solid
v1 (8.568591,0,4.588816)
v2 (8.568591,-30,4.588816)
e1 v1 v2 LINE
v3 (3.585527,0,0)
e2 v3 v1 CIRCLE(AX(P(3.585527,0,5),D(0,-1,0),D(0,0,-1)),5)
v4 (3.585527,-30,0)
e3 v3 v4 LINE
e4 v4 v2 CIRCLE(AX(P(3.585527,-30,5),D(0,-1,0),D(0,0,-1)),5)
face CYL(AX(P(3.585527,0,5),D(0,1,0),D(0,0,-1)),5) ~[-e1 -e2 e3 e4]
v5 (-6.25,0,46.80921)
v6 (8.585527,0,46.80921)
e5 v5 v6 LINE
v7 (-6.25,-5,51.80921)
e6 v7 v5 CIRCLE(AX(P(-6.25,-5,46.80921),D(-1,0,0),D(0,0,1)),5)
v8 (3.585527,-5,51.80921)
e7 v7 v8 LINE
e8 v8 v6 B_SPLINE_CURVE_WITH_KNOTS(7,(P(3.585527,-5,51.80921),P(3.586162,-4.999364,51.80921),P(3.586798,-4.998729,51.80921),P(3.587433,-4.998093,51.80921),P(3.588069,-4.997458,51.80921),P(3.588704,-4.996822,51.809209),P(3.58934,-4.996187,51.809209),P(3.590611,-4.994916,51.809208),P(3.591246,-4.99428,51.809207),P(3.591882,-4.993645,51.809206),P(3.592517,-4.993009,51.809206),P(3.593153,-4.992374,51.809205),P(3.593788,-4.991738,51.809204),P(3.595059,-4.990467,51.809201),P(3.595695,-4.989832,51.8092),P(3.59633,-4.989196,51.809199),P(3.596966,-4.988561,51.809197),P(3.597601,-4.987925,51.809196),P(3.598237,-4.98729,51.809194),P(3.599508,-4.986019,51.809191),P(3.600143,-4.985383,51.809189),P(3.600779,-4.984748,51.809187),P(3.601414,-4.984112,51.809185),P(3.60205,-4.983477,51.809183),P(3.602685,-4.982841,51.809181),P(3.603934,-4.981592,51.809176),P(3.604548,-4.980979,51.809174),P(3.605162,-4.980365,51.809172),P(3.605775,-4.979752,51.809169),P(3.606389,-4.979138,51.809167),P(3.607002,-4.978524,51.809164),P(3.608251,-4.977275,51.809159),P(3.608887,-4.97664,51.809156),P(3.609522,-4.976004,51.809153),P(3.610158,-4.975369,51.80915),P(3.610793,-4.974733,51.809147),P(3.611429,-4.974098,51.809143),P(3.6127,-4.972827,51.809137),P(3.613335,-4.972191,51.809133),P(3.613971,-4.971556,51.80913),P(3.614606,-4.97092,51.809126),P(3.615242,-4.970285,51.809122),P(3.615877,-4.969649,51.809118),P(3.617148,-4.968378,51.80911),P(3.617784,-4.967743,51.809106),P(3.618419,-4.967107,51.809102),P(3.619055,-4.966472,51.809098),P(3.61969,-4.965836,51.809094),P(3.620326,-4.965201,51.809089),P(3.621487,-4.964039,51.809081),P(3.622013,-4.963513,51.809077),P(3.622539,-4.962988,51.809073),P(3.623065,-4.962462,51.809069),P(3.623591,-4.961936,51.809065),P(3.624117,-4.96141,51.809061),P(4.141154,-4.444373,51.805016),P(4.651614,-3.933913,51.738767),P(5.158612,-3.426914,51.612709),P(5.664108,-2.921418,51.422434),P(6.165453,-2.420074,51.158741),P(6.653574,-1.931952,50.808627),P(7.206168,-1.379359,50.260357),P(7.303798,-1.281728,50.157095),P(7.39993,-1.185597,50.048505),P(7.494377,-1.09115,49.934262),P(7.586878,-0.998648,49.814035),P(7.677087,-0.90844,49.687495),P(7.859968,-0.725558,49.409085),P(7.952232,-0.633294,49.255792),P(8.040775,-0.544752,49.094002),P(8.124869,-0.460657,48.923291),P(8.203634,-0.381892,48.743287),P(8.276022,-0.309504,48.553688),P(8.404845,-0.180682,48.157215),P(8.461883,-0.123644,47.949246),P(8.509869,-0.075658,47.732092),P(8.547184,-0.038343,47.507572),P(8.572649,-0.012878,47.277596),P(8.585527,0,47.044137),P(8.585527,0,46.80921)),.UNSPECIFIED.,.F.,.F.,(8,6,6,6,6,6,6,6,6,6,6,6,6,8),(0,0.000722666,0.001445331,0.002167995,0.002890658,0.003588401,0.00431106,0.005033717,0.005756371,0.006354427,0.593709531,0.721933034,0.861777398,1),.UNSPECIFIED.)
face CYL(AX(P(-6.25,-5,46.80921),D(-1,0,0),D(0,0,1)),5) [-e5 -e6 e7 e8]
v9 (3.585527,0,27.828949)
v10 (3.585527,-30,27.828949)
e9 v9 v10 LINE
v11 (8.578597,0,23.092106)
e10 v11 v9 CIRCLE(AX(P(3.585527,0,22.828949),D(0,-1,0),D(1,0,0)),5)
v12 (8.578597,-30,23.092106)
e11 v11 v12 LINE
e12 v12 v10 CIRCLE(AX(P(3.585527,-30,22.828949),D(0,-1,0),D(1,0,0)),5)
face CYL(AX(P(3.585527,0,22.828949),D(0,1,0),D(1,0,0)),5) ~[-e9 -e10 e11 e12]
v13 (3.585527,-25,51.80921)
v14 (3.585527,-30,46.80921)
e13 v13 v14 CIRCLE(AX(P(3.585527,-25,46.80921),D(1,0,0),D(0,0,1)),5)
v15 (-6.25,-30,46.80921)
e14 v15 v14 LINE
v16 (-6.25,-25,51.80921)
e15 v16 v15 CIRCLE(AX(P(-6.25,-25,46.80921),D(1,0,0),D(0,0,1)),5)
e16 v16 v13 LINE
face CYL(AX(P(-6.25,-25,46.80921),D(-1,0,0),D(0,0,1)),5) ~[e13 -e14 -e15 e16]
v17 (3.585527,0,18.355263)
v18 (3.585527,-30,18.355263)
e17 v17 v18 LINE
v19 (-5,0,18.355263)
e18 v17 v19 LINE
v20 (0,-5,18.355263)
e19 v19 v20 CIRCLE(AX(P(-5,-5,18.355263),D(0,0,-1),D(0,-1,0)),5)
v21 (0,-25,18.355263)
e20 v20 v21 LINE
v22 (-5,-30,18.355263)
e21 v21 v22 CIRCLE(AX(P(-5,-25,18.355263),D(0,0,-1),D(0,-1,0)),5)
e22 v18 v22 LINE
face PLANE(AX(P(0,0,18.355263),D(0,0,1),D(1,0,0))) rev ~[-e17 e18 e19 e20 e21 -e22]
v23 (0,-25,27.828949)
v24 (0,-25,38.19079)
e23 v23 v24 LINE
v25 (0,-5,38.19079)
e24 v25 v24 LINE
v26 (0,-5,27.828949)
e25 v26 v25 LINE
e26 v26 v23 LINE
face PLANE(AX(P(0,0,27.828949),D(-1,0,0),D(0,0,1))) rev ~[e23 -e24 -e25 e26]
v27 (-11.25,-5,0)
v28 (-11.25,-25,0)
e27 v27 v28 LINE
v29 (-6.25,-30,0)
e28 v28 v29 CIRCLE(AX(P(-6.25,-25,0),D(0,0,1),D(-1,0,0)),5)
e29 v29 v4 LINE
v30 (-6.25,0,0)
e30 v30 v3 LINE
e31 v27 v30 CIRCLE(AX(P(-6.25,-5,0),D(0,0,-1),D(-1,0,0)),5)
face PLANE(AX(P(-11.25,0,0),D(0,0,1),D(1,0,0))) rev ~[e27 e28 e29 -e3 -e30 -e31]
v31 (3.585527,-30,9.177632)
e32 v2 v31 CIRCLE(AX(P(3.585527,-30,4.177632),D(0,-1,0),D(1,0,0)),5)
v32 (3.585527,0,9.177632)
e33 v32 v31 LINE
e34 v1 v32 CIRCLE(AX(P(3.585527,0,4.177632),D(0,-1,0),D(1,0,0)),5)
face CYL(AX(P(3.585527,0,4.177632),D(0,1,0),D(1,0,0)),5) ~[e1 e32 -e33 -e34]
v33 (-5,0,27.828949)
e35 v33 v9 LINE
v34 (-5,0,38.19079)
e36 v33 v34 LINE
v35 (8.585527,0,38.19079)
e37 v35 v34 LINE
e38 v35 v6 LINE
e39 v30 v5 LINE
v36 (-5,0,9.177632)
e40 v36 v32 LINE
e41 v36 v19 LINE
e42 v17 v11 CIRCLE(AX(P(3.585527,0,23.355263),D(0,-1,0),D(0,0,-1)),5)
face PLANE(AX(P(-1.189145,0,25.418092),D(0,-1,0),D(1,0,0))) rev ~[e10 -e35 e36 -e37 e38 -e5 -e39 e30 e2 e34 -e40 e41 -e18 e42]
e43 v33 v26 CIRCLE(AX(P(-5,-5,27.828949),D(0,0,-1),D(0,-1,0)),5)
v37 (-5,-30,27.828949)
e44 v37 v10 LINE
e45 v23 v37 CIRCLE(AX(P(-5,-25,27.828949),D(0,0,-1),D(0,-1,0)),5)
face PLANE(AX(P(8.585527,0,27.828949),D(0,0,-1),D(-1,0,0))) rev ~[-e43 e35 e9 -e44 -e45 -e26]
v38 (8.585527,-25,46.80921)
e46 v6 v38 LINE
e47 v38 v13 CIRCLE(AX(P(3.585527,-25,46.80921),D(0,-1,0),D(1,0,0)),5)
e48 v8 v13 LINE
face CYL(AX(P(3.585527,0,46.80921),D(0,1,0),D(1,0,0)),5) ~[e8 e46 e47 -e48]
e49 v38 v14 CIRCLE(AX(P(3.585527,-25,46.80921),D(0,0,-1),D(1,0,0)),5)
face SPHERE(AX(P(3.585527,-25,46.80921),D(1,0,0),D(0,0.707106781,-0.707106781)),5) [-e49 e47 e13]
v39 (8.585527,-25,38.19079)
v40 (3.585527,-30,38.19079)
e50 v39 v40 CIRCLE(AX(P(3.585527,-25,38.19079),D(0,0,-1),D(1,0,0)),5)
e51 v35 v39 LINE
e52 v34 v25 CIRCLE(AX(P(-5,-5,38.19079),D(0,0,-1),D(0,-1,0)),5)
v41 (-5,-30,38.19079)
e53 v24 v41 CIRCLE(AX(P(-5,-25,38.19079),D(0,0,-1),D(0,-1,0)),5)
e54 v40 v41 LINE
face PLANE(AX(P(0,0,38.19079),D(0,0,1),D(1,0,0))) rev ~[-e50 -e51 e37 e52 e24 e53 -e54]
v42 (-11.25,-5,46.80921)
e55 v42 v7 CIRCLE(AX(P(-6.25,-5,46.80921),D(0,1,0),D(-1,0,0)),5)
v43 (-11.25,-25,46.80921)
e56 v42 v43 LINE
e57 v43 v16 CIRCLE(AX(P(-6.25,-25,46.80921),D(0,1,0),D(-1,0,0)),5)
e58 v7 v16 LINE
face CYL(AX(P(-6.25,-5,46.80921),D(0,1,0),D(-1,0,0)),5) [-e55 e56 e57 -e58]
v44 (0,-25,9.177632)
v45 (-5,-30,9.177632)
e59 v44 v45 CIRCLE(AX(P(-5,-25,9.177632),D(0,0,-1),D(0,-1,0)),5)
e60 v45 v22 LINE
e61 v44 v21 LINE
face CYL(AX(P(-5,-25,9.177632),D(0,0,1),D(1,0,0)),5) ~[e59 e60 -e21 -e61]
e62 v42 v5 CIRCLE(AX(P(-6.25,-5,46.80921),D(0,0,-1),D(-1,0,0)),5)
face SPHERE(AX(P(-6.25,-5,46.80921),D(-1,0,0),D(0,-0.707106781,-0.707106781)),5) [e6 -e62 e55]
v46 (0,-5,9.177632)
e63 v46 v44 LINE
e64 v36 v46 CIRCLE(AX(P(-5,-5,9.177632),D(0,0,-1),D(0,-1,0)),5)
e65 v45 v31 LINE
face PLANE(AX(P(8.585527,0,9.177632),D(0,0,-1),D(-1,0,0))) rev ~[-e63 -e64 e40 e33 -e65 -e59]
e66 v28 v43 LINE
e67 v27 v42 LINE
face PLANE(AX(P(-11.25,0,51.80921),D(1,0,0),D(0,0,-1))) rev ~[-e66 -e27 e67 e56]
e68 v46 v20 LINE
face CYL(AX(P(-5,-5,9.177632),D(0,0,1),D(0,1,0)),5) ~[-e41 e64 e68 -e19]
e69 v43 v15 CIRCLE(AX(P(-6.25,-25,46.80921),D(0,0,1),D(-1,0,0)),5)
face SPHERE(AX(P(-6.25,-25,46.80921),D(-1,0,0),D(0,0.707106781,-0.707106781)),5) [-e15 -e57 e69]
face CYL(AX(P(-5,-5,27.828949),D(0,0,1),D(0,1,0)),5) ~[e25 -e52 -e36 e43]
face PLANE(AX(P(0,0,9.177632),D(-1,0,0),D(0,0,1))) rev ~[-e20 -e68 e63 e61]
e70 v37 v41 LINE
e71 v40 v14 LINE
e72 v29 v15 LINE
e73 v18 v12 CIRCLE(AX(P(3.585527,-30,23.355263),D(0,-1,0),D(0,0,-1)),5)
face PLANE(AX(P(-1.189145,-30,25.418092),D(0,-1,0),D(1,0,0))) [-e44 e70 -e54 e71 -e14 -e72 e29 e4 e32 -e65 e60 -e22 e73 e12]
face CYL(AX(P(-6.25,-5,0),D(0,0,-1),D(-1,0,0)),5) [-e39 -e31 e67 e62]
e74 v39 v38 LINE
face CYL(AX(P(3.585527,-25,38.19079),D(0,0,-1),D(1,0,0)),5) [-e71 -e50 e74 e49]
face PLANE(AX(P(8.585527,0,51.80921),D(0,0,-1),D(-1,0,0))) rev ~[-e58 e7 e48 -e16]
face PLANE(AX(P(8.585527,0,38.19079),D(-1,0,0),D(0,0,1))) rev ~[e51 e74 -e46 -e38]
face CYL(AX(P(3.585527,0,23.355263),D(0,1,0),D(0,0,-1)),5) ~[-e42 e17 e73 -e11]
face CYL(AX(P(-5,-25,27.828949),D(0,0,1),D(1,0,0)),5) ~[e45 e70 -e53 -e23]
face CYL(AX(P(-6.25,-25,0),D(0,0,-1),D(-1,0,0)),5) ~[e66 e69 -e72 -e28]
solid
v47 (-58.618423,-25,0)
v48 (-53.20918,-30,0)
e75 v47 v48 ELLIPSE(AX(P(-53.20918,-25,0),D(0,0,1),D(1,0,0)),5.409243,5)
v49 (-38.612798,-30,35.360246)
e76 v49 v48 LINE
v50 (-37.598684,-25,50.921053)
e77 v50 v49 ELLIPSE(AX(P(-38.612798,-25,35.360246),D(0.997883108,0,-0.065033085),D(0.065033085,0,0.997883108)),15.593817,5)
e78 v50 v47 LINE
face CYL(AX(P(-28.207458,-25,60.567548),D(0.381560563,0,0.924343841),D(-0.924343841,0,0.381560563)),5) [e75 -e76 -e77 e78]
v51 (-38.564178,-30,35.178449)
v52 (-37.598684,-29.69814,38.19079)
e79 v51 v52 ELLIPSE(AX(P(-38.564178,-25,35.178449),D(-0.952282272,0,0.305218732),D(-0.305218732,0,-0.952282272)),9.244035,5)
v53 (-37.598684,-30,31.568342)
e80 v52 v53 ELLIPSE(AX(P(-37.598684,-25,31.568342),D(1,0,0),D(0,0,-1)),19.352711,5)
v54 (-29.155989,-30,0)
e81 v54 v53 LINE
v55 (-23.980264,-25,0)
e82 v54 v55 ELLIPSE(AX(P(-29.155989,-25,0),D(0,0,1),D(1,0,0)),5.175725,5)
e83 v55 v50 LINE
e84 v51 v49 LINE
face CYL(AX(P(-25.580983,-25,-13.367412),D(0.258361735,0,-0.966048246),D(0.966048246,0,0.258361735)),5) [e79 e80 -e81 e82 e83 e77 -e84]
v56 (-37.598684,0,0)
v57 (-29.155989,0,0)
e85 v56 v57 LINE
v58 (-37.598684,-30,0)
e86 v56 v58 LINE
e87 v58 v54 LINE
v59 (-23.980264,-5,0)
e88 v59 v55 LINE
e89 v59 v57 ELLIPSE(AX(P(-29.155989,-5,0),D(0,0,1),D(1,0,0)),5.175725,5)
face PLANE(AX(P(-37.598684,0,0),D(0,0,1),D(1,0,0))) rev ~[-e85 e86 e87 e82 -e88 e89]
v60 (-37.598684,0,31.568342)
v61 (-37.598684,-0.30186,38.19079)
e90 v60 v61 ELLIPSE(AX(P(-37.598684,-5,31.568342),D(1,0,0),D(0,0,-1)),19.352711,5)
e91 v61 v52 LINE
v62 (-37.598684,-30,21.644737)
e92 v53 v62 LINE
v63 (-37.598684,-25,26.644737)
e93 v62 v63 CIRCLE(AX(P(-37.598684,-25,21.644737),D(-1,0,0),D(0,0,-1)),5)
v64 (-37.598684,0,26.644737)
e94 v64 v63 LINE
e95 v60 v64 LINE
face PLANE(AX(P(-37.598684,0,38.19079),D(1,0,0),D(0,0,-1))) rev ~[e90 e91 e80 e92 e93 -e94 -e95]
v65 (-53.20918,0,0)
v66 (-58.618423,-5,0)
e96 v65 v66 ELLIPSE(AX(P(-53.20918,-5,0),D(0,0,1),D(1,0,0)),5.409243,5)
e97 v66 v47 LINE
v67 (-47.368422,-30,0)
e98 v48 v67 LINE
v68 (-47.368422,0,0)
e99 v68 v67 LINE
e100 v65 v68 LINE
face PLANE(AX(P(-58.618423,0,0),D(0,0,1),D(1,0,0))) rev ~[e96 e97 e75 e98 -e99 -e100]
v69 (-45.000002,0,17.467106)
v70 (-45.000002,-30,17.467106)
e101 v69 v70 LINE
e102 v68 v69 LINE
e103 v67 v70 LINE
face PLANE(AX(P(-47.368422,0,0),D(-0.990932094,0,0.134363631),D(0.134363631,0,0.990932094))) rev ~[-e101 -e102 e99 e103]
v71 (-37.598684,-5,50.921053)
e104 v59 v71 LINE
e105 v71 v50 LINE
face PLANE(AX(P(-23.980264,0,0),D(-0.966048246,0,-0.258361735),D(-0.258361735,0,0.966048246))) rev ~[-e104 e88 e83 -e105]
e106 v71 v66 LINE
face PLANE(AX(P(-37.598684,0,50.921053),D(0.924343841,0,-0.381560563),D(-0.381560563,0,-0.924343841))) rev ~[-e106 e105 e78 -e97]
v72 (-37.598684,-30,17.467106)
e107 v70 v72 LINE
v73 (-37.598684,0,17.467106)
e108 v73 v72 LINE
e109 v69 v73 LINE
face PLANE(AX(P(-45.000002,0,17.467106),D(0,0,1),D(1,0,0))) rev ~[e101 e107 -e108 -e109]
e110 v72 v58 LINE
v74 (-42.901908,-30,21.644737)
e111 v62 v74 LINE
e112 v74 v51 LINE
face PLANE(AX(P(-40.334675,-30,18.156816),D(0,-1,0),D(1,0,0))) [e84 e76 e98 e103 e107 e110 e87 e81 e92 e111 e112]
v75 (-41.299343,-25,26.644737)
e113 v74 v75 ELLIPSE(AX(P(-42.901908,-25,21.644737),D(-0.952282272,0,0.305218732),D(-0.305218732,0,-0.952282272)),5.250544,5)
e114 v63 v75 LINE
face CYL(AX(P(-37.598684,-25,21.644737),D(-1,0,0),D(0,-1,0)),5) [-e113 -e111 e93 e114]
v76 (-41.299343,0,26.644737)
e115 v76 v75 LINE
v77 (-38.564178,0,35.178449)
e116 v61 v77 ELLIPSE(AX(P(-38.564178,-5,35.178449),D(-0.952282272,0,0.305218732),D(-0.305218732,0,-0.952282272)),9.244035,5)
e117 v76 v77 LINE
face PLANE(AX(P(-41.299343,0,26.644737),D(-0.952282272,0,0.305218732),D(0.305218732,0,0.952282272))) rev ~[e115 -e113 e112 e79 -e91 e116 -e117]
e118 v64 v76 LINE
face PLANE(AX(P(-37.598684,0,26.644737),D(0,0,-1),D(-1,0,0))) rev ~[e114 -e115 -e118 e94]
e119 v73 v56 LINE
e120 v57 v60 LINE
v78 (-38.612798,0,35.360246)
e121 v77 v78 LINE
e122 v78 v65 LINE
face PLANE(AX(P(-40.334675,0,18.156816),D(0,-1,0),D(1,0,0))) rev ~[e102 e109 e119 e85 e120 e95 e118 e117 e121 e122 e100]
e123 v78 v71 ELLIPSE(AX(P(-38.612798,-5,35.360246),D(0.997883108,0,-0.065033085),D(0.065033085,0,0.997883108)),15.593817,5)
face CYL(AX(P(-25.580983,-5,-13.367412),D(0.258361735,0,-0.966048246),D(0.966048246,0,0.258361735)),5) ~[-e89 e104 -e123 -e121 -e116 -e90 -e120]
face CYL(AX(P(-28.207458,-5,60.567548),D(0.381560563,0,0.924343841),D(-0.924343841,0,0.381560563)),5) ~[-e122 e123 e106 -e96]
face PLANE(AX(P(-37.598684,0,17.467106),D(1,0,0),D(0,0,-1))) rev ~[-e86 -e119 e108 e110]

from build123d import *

# Parameters (mm, degrees)
F1_DEPTH       = 30
F2_T1_DEPTH    = 80.0888645747
F2_T3_DEPTH    = 77.7106724757
F2_2_T1_DEPTH  = 46.8092103302
F2_2_T3_DEPTH  = 14.835527055
F2_2_T5_DEPTH  = 9.835527055
F2_2_T7_DEPTH  = 20
F2_2_T9_DEPTH  = 8.6184208095
F2_2_T11_DEPTH = 25
F2_2_T13_DEPTH = 30
F2_2_S17_W     = 5.1
F2_2_S17_H     = 5.1
F2_2_T18_DEPTH = 5.1
F2_2_S23_W     = 5.1
F2_2_S23_H     = 5.1
F2_2_T24_DEPTH = 5.1
F2_2_S29_W     = 5.1
F2_2_S29_H     = 5.1
F2_2_T30_DEPTH = 5.1
F2_2_T37_DEPTH = 37.5
F2_2_T41_DEPTH = 27.335527055
F3_R           = 5
F3_2_R         = 5


# Not quite as in the source:
# - a fillet or chamfer that OpenCascade refuses, or shapes differently, is made with other operations: its cross-section is extruded or revolved along the edge and cut away or added


with BuildPart() as f1:
    # F0 (on Front) → F1 (new body)
    with BuildSketch(Plane.XZ):
        Polygon((-37.5986844301, 50.9210526943), (-58.6184225976, 0), (-47.3684221506, 0), (-45.0000017881, 17.4671057612), (-37.5986844301, 17.4671057612), (-37.5986844301, 0), (-23.9802636206, 0), align=None)
        Polygon((-37.5986844301, 26.6447365284), (-41.2993431091, 26.6447365284), (-37.5986844301, 38.1907895207), align=None, mode=Mode.SUBTRACT)
    extrude(amount=F1_DEPTH)

    # F2: fillet of radius 5 on 4 edges, made by hand

    # F2_s2 → F2_t1 (cut)
    with BuildSketch(Plane(origin=(17.2550791502, 0, 41.8010342303), x_dir=(0, 1, 0), z_dir=(-0.3815605627, 0, -0.9243438413))):
        with BuildLine():
            ThreePointArc((-25, -54.1835779154), (-28.5355339059, -52.7191118213), (-30, -49.1835779154))
            Line((-30, -49.1835779154), (-30, -54.1835779154))
            Line((-30, -54.1835779154), (-25, -54.1835779154))
        make_face()
        with BuildLine():
            ThreePointArc((-5, -54.1835779154), (-1.4644660941, -52.7191118213), (0, -49.1835779154))
            Line((0, -49.1835779154), (0, -54.1835779154))
            Line((0, -54.1835779154), (-5, -54.1835779154))
        make_face()
    extrude(amount=F2_T1_DEPTH, mode=Mode.SUBTRACT)

    # F2_s4 → F2_t3 (cut)
    with BuildSketch(Plane(origin=(1.6288202397, 0, -6.0903714472), x_dir=(0, 1, 0), z_dir=(-0.2583617353, 0, 0.9660482461))):
        with BuildLine():
            ThreePointArc((-25, 23.166091611), (-28.5355339059, 24.6305577051), (-30, 28.166091611))
            Line((-30, 28.166091611), (-30, 23.166091611))
            Line((-30, 23.166091611), (-25, 23.166091611))
        make_face()
        with BuildLine():
            ThreePointArc((-5, 23.166091611), (-1.4644660941, 24.6305577051), (0, 28.166091611))
            Line((0, 28.166091611), (0, 23.166091611))
            Line((0, 23.166091611), (-5, 23.166091611))
        make_face()
    extrude(amount=F2_T3_DEPTH, mode=Mode.SUBTRACT)

    # F3
    f3_edges = [f1.edges().sort_by_distance(p)[0] for p in [
        (-39.449014, -30, 26.644737),
    ]]
    fillet(f3_edges, radius=F3_R)


with BuildPart() as f1b:
    # F0 (on Front) → F1, piece 2 (new body)
    with BuildSketch(Plane.XZ):
        Polygon((-11.250000447, 51.8092103302), (-11.250000447, 0), (8.5855266079, 0), (8.5855266079, 9.1776316985), (0, 9.1776316985), (0, 18.3552633971), (8.5855266079, 18.3552633971), (8.5855266079, 27.8289485723), (0, 27.8289485723), (0, 38.1907895207), (8.5855266079, 38.1907895207), (8.5855266079, 51.8092103302), align=None)
    extrude(amount=F1_DEPTH)

    # F2#2: fillet of radius 5 on 11 edges, made by hand

    # F2_2_s2 → F2_2_t1 (cut)
    with BuildSketch(Plane.XY):
        with BuildLine():
            ThreePointArc((-11.250000447, -5), (-9.785534353, -1.4644660941), (-6.250000447, 0))
            Line((-6.250000447, 0), (-6.250000447, 0.1))
            Line((-6.250000447, 0.1), (-11.350000447, 0.1))
            Line((-11.350000447, 0.1), (-11.350000447, -5))
            Line((-11.350000447, -5), (-11.250000447, -5))
        make_face()
        with BuildLine():
            ThreePointArc((-11.250000447, -25), (-9.785534353, -28.5355339059), (-6.250000447, -30))
            Line((-6.250000447, -30), (-6.250000447, -30.1))
            Line((-6.250000447, -30.1), (-11.350000447, -30.1))
            Line((-11.350000447, -30.1), (-11.350000447, -25))
            Line((-11.350000447, -25), (-11.250000447, -25))
        make_face()
    extrude(amount=F2_2_T1_DEPTH, mode=Mode.SUBTRACT)

    # F2_2_s4 → F2_2_t3 (cut)
    with BuildSketch(Plane.YZ.offset(-6.250000447)):
        with BuildLine():
            ThreePointArc((-5, 51.8092103302), (-1.4644660941, 50.3447442362), (0, 46.8092103302))
            Line((0, 46.8092103302), (0.1, 46.8092103302))
            Line((0.1, 46.8092103302), (0.1, 51.9092103302))
            Line((0.1, 51.9092103302), (-5, 51.9092103302))
            Line((-5, 51.9092103302), (-5, 51.8092103302))
        make_face()
    extrude(amount=F2_2_T3_DEPTH, mode=Mode.SUBTRACT)

    # F2_2_s6 → F2_2_t5 (cut)
    with BuildSketch(Plane.YZ.offset(-6.250000447)):
        with BuildLine():
            ThreePointArc((-25, 51.8092103302), (-28.5355339059, 50.3447442362), (-30, 46.8092103302))
            Line((-30, 46.8092103302), (-30.1, 46.8092103302))
            Line((-30.1, 46.8092103302), (-30.1, 51.9092103302))
            Line((-30.1, 51.9092103302), (-25, 51.9092103302))
            Line((-25, 51.9092103302), (-25, 51.8092103302))
        make_face()
    extrude(amount=F2_2_T5_DEPTH, mode=Mode.SUBTRACT)

    # F2_2_s8 → F2_2_t7 (cut)
    with BuildSketch(Plane.XZ.offset(5)):
        with BuildLine():
            ThreePointArc((-11.250000447, 46.8092103302), (-9.785534353, 50.3447442362), (-6.250000447, 51.8092103302))
            Line((-6.250000447, 51.8092103302), (-6.250000447, 51.9092103302))
            Line((-6.250000447, 51.9092103302), (-11.350000447, 51.9092103302))
            Line((-11.350000447, 51.9092103302), (-11.350000447, 46.8092103302))
            Line((-11.350000447, 46.8092103302), (-11.250000447, 46.8092103302))
        make_face()
    extrude(amount=F2_2_T7_DEPTH, mode=Mode.SUBTRACT)

    # F2_2_s10 → F2_2_t9 (cut)
    with BuildSketch(Plane.XY.offset(38.1907895207)):
        with BuildLine():
            ThreePointArc((8.5855266079, -25), (7.1210605139, -28.5355339059), (3.5855266079, -30))
            Line((3.5855266079, -30), (3.5855266079, -30.1))
            Line((3.5855266079, -30.1), (8.6855266079, -30.1))
            Line((8.6855266079, -30.1), (8.6855266079, -25))
            Line((8.6855266079, -25), (8.5855266079, -25))
        make_face()
    extrude(amount=F2_2_T9_DEPTH, mode=Mode.SUBTRACT)

    # F2_2_s12 → F2_2_t11 (cut)
    with BuildSketch(Plane.XZ):
        with BuildLine():
            ThreePointArc((8.5855266079, 46.8092103302), (7.1210605139, 50.3447442362), (3.5855266079, 51.8092103302))
            Line((3.5855266079, 51.8092103302), (3.5855266079, 51.9092103302))
            Line((3.5855266079, 51.9092103302), (8.6855266079, 51.9092103302))
            Line((8.6855266079, 51.9092103302), (8.6855266079, 46.8092103302))
            Line((8.6855266079, 46.8092103302), (8.5855266079, 46.8092103302))
        make_face()
    extrude(amount=F2_2_T11_DEPTH, mode=Mode.SUBTRACT)

    # F2_2_s14 → F2_2_t13 (cut)
    with BuildSketch(Plane.XZ):
        with BuildLine():
            ThreePointArc((8.5855266079, 22.8289485723), (7.1210605139, 26.3644824782), (3.5855266079, 27.8289485723))
            Line((3.5855266079, 27.8289485723), (3.5855266079, 27.9289485723))
            Line((3.5855266079, 27.9289485723), (8.6855266079, 27.9289485723))
            Line((8.6855266079, 27.9289485723), (8.6855266079, 22.8289485723))
            Line((8.6855266079, 22.8289485723), (8.5855266079, 22.8289485723))
        make_face()
        with BuildLine():
            ThreePointArc((3.5855266079, 18.3552633971), (7.1210605139, 19.8197294912), (8.5855266079, 23.3552633971))
            Line((8.5855266079, 23.3552633971), (8.6855266079, 23.3552633971))
            Line((8.6855266079, 23.3552633971), (8.6855266079, 18.2552633971))
            Line((8.6855266079, 18.2552633971), (3.5855266079, 18.2552633971))
            Line((3.5855266079, 18.2552633971), (3.5855266079, 18.3552633971))
        make_face()
        with BuildLine():
            ThreePointArc((8.5855266079, 4.1776316985), (7.1210605139, 7.7131656045), (3.5855266079, 9.1776316985))
            Line((3.5855266079, 9.1776316985), (3.5855266079, 9.2776316985))
            Line((3.5855266079, 9.2776316985), (8.6855266079, 9.2776316985))
            Line((8.6855266079, 9.2776316985), (8.6855266079, 4.1776316985))
            Line((8.6855266079, 4.1776316985), (8.5855266079, 4.1776316985))
        make_face()
        with BuildLine():
            ThreePointArc((3.5855266079, 0), (7.1210605139, 1.4644660941), (8.5855266079, 5))
            Line((8.5855266079, 5), (8.6855266079, 5))
            Line((8.6855266079, 5), (8.6855266079, -0.1))
            Line((8.6855266079, -0.1), (3.5855266079, -0.1))
            Line((3.5855266079, -0.1), (3.5855266079, 0))
        make_face()
    extrude(amount=F2_2_T13_DEPTH, mode=Mode.SUBTRACT)


with BuildPart() as f2_2_tool16:
    # F2_2_s17 → F2_2_t18 (new body)
    with BuildSketch(Plane.YZ.offset(-6.250000447)):
        with Locations((-2.45, 49.3592103302)):
            Rectangle(F2_2_S17_W, F2_2_S17_H)
    extrude(amount=-F2_2_T18_DEPTH)

    # F2_2_s19 → F2_2_t20 (revolve, cut)
    with BuildSketch(Plane(origin=(-6.250000447, -5, 46.8092103302), x_dir=(0, -0.7071067812, -0.7071067812), z_dir=(0, 0.7071067812, -0.7071067812))):
        with BuildLine():
            ThreePointArc((0, -5), (5, 0), (0, 5))
            Line((0, 5), (0, -5))
        make_face()
    revolve(axis=Axis((-6.250000447, -5, 46.8092103302), (-1, 0, 0)), mode=Mode.SUBTRACT)


with BuildPart() as f1b_1:
    add(f1b.part)

    # F2_2_t15: cut F2_2_tool16
    add(f2_2_tool16.part, mode=Mode.SUBTRACT)


with BuildPart() as f2_2_tool22:
    # F2_2_s23 → F2_2_t24 (new body)
    with BuildSketch(Plane.YZ.offset(3.5855266079)):
        with Locations((-27.55, 49.3592103302)):
            Rectangle(F2_2_S23_W, F2_2_S23_H)
    extrude(amount=F2_2_T24_DEPTH)

    # F2_2_s25 → F2_2_t26 (revolve, cut)
    with BuildSketch(Plane(origin=(3.5855266079, -25, 46.8092103302), x_dir=(0, 0.7071067812, -0.7071067812), z_dir=(0, -0.7071067812, -0.7071067812))):
        with BuildLine():
            ThreePointArc((0, -5), (5, 0), (0, 5))
            Line((0, 5), (0, -5))
        make_face()
    revolve(axis=Axis((3.5855266079, -25, 46.8092103302), (1, 0, 0)), mode=Mode.SUBTRACT)


with BuildPart() as f1b_2:
    add(f1b_1.part)

    # F2_2_t21: cut F2_2_tool22
    add(f2_2_tool22.part, mode=Mode.SUBTRACT)


with BuildPart() as f2_2_tool28:
    # F2_2_s29 → F2_2_t30 (new body)
    with BuildSketch(Plane.YZ.offset(-6.250000447)):
        with Locations((-27.55, 49.3592103302)):
            Rectangle(F2_2_S29_W, F2_2_S29_H)
    extrude(amount=-F2_2_T30_DEPTH)

    # F2_2_s31 → F2_2_t32 (revolve, cut)
    with BuildSketch(Plane(origin=(-6.250000447, -25, 46.8092103302), x_dir=(0, 0.7071067812, -0.7071067812), z_dir=(0, 0.7071067812, 0.7071067812))):
        with BuildLine():
            ThreePointArc((0, -5), (5, 0), (0, 5))
            Line((0, 5), (0, -5))
        make_face()
    revolve(axis=Axis((-6.250000447, -25, 46.8092103302), (-1, 0, 0)), mode=Mode.SUBTRACT)


with BuildPart() as f1b_3:
    add(f1b_2.part)

    # F2_2_t27: cut F2_2_tool28
    add(f2_2_tool28.part, mode=Mode.SUBTRACT)


with BuildPart() as f2_2_tool35:
    # F2_2_s36 → F2_2_t37 (new body)
    with BuildSketch(Plane.XZ.offset(-12.5)):
        with BuildLine():
            ThreePointArc((8.5855266079, 46.8092103302), (7.1210605139, 50.3447442362), (3.5855266079, 51.8092103302))
            Line((3.5855266079, 51.8092103302), (3.5855266079, 51.9092103302))
            Line((3.5855266079, 51.9092103302), (8.6855266079, 51.9092103302))
            Line((8.6855266079, 51.9092103302), (8.6855266079, 46.8092103302))
            Line((8.6855266079, 46.8092103302), (8.5855266079, 46.8092103302))
        make_face()
    extrude(amount=F2_2_T37_DEPTH)

    split(bisect_by=Plane.XZ, keep=Keep.BOTTOM)


with BuildPart() as f2_2_tool39:
    # F2_2_s40 → F2_2_t41 (new body)
    with BuildSketch(Plane.YZ.offset(21.0855266079)):
        with BuildLine():
            ThreePointArc((-5, 51.8092103302), (-1.4644660941, 50.3447442362), (0, 46.8092103302))
            Line((0, 46.8092103302), (0.1, 46.8092103302))
            Line((0.1, 46.8092103302), (0.1, 51.9092103302))
            Line((0.1, 51.9092103302), (-5, 51.9092103302))
            Line((-5, 51.9092103302), (-5, 51.8092103302))
        make_face()
    extrude(amount=-F2_2_T41_DEPTH)

    split(bisect_by=Plane.YZ.offset(8.5855266079), keep=Keep.TOP)


with BuildPart() as f2_2_tool35_1:
    add(f2_2_tool35.part)

    # F2_2_t43: intersect F2_2_tool39
    add(f2_2_tool39.part, mode=Mode.INTERSECT)


with BuildPart() as f1b_4:
    add(f1b_3.part)

    # F2_2_t33: cut F2_2_tool35
    add(f2_2_tool35_1.part, mode=Mode.SUBTRACT)

    # F3#2
    f3_2_edges = [f1b_4.edges().sort_by_distance(p)[0] for p in [
        (0, 0, 33.009869),
        (0, 0, 13.766448),
        (0, -30, 13.766448),
        (0, -30, 33.009869),
    ]]
    fillet(f3_2_edges, radius=F3_2_R)


solid = Compound([f1.part, f1b_4.part])
